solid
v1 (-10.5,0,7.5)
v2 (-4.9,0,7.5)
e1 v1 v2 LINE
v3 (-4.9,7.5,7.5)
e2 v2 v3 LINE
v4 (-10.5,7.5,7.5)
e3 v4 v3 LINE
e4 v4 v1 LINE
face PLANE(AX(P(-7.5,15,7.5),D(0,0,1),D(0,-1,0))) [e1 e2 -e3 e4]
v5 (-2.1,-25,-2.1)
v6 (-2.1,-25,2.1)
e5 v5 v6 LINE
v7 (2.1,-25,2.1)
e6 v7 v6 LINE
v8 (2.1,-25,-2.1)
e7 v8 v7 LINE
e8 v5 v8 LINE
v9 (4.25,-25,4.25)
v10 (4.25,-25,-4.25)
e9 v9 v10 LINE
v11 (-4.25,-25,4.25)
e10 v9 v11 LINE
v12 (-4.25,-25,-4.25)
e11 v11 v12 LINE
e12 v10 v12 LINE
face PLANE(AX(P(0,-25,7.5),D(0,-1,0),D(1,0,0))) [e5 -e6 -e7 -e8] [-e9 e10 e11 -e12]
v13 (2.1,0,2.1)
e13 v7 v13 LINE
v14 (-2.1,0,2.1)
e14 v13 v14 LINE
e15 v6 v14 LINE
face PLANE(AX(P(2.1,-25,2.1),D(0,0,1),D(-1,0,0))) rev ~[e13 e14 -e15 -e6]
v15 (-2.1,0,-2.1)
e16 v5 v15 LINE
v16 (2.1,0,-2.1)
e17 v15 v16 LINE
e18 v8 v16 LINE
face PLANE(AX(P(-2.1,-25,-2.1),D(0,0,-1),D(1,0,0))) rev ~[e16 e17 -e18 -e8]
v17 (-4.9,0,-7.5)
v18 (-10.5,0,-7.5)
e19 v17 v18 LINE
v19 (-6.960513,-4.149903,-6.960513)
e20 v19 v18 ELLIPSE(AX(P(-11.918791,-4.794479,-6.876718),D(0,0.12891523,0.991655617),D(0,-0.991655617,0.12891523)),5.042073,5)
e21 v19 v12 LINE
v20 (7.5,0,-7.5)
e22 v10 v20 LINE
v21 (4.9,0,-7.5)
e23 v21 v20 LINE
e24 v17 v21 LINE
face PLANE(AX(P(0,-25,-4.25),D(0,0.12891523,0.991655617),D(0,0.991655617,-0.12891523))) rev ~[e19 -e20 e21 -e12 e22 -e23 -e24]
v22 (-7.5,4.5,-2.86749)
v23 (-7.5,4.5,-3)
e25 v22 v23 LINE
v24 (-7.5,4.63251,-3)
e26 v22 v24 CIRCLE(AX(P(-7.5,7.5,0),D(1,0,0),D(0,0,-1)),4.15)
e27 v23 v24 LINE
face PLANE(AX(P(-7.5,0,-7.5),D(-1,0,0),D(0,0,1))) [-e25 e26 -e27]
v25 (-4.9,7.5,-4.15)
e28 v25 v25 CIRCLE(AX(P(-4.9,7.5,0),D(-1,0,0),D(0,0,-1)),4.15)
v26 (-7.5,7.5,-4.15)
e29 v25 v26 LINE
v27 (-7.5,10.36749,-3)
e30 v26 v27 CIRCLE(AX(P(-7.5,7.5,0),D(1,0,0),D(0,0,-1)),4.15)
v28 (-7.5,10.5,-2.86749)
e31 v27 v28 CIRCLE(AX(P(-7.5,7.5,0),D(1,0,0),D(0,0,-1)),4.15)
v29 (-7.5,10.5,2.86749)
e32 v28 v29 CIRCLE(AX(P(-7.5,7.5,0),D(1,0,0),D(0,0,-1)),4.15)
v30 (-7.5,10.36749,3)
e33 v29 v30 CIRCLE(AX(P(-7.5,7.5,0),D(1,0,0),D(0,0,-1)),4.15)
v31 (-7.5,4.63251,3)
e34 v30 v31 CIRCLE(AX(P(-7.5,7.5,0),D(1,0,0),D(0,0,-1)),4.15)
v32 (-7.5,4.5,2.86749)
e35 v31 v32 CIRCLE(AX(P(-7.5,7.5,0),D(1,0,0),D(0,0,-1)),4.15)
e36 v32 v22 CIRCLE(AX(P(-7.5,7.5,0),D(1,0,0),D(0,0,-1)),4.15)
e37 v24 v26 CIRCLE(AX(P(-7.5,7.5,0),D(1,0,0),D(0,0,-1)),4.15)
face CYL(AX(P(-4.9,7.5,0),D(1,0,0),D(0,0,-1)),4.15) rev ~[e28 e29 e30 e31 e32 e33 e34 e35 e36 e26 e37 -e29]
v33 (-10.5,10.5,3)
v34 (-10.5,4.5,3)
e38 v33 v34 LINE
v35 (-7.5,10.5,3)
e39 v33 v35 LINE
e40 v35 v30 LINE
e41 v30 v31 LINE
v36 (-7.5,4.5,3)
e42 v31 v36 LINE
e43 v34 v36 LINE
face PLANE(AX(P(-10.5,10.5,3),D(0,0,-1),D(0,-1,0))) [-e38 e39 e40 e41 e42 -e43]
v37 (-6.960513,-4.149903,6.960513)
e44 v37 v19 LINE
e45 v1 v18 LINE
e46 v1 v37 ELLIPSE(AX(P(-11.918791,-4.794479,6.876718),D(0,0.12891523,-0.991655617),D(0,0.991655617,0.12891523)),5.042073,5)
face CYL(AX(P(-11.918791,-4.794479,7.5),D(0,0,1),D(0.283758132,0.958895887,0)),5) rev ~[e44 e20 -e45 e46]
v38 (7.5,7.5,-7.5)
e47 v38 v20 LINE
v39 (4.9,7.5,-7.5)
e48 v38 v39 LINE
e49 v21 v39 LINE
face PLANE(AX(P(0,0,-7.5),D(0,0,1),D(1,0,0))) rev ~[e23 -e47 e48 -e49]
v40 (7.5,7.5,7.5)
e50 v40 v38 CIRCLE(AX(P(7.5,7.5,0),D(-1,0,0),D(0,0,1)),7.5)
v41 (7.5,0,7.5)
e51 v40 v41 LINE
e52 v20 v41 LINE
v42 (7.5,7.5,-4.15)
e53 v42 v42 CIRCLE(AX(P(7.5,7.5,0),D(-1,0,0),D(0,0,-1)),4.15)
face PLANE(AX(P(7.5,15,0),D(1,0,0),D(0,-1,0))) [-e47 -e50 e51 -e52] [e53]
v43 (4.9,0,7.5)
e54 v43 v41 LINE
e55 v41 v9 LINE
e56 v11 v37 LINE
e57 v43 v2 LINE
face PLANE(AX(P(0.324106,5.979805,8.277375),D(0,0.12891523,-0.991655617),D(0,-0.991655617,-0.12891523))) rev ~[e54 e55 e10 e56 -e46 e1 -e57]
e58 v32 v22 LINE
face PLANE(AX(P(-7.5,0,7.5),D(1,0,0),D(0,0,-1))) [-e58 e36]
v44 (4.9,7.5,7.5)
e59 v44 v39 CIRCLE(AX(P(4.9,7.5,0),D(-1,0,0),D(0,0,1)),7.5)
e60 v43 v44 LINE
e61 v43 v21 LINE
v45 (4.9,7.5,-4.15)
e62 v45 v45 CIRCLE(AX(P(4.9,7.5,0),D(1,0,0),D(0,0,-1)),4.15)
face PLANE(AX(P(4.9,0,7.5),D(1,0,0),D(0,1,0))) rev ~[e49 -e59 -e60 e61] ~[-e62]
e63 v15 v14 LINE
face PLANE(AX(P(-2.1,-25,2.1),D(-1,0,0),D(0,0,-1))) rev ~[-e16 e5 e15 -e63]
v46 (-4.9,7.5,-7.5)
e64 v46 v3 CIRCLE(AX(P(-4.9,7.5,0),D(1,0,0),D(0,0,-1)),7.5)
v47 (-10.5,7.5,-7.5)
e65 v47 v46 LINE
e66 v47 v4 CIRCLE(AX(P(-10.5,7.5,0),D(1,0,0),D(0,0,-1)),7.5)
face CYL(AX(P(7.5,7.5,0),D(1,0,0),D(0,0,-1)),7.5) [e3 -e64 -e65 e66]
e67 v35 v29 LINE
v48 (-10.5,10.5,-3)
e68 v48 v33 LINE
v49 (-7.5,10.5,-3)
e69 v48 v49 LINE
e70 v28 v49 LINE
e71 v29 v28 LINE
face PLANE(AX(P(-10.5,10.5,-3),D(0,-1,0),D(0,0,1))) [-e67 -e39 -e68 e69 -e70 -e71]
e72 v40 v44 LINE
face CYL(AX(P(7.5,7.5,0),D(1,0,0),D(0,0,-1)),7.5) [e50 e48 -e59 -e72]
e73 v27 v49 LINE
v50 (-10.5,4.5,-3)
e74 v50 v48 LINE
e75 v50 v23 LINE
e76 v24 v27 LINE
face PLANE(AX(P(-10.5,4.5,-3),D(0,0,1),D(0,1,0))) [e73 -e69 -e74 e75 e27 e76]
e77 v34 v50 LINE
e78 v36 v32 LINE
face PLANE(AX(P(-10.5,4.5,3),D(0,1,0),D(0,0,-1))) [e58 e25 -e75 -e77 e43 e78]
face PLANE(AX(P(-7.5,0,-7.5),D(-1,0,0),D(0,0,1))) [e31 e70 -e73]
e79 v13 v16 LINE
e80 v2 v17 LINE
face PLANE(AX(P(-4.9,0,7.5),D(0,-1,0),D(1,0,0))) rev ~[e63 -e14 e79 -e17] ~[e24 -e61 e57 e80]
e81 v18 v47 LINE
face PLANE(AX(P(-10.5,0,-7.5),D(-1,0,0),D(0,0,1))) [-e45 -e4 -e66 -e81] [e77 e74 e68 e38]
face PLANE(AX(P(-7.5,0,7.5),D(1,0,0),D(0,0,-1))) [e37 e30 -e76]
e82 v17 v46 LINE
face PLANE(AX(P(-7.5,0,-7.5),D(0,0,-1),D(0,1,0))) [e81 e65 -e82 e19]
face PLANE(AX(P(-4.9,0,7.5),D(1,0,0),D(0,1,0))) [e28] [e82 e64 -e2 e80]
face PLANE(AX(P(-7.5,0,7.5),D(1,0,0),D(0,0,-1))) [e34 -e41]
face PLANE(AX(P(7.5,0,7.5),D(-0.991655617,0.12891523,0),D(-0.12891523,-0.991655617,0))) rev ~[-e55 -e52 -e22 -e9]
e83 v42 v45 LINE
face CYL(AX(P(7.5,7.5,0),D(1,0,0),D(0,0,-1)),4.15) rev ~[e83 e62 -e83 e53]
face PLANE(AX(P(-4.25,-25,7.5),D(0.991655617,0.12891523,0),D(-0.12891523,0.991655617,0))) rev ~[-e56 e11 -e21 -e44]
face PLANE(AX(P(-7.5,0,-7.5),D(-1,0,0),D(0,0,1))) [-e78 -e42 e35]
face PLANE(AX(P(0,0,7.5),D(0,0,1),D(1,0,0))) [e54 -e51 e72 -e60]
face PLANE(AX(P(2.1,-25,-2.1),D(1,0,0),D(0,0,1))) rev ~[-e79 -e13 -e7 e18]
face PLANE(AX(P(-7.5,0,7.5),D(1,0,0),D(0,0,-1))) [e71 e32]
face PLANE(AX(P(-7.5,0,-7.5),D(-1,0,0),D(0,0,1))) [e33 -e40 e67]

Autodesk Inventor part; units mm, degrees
ref_plane "YZ Plane" through (0, 0, 0) normal (1, 0, 0) x (0, 1, 0)
ref_plane "XZ Plane" through (0, 0, 0) normal (0, 1, 0) x (-1, 0, 0)
ref_plane "XY Plane" through (0, 0, 0) normal (0, 0, 1) x (1, 0, 0)
sketch "Sketch1" plane through (0, 0, 0) normal (0, 0, 1) x (1, 0, 0)
  line L0 (0, 0) -> (-7.5, 0)
  line L1 (-7.5, 0) -> (-7.5, 15)
  line L2 (-7.5, 15) -> (7.5, 15)
  line L3 (7.5, 15) -> (7.5, 0)
  line L4 (7.5, 0) -> (-7.5, 0)
  dimension "d55" = 7.5
  dimension "d56" = 15
  dimension "d57" = 15
extrude "Extrusion1" add sketch "Sketch1" along normal mid plane 15
sketch "Sketch11" plane through (0, 0, 7.5) normal (0, 0, 1) x (1, 0, 0)
  line L0 (7.5, 15) -> (-7.5, 15) projected
  line L1 (0, 15) -> (0, -25)
  line L2 (0, -25) -> (4.25, -25)
  line L3 (0, -25) -> (-4.25, -25)
  line L4 (-7.5, 0) -> (7.5, 0) projected
  line L5 (-4.25, -25) -> (-7.5, 0)
  line L6 (-7.5, 0) -> (7.5, 0)
  line L7 (7.5, 0) -> (4.25, -25)
  point P0 (0, 0)
  dimension "d58" = 40
  dimension "d59" = 4.25
  dimension "d60" = 4.25
extrude "Extrusion7" add sketch "Sketch11" against normal blind 15
sketch "Sketch13" plane through (0, 0, 0) normal (1, 0, 0) x (0, 1, 0)
  line L0 (15, -7.5) -> (15, 7.5) projected
  line L1 (15, 0) -> (-25, 0)
  line L2 (-25, 7.5) -> (-25, -7.5) projected
  line L3 (-25, 0) -> (-25, 4.25)
  line L4 (-25, 7.5) -> (-25, -7.5) projected
  line L5 (-25, 4.25) -> (-25, 0)
  line L6 (-25, 0) -> (-25, -4.25)
  line L7 (0, -7.5) -> (15, -7.5) projected
  line L8 (-25, -4.25) -> (0, -7.5)
  line L9 (0, -7.5) -> (0, 7.5)
  line L10 (0, 7.5) -> (-25, 4.25)
  line L11 (-25, 4.25) -> (-25, 7.5)
  line L12 (-25, 7.5) -> (0, 7.5)
  line L13 (-25, -4.25) -> (-25, -7.5)
  line L14 (-25, -7.5) -> (0, -7.5) projected
  line L15 (-25, -7.5) -> (0, -7.5)
  point P0 (0, 0)
  dimension "d68" = 40
  dimension "d69" = 4.25
  dimension "d70" = 4.25
extrude "Extrusion8" cut sketch "Sketch13" along normal through all both and the other way through all contours L14 L2 L8 | L10 L2 L12
sketch "Sketch15" plane through (-4.25, -25, -4.25) normal (0, -1, 0) x (1, 0, 0)
  line L0 (4.25, 4.25) -> (2.15, 4.25)
  line L1 (0, 8.5) -> (0, 0) projected
  line L2 (2.15, 4.25) -> (2.15, 2.15)
  line L3 (2.15, 2.15) -> (6.35, 2.15)
  line L4 (6.35, 2.15) -> (6.35, 6.35)
  line L5 (6.35, 6.35) -> (2.15, 6.35)
  line L6 (2.15, 6.35) -> (2.15, 4.25)
  point P0 (8.5, 8.5)
  point P1 (8.5, 0)
  dimension "d112" = 2.1
  dimension "d113" = 2.1
  dimension "d114" = 4.2
  dimension "d115" = 4.2
extrude "Extrusion9" cut sketch "Sketch15" against normal through all
sketch "Sketch16" plane through (0, 0, 7.5) normal (0, 0, 1) x (1, 0, 0)
  line L0 (0, 0) -> (4.9, 0)
  line L1 (-7.5, 0) -> (7.5, 0) projected
  line L2 (4.9, 0) -> (4.9, 16.5506)
  line L3 (0, 0) -> (-4.9, 0)
  line L4 (-4.9, 0) -> (-4.9, 16.5506)
  line L5 (-4.9, 16.5506) -> (4.9, 16.5506)
  dimension "d83" = 4.9
  dimension "d84" = 4.9
extrude "Extrusion10" cut sketch "Sketch16" against normal through all
sketch "Sketch17" plane through (7.5, 15, 7.5) normal (1, 0, 0) x (0, 0, -1)
  line L0 (15, 0) -> (0, 0) projected
  line L1 (0, 0) -> (7.5, 0)
  line L2 (7.5, 0) -> (7.5, -7.5)
  arc A0 (15, -7.5) -> (0, -7.5) centre (7.5, -7.5) ccw
  line L3 (0, 0) -> (0, -15) projected
  line L4 (0, -7.5) -> (0, 0)
  line L5 (0, 0) -> (15, 0)
  line L6 (15, -15) -> (15, 0) projected
  line L7 (15, 0) -> (15, -7.5)
  point P0 (7.5, -15)
  dimension "d87" = 7.5
extrude "Extrusion11" cut sketch "Sketch17" against normal through all
sketch "Sketch18" plane through (7.5, 0, 7.5) normal (1, 0, 0) x (0, 0, -1)
  line L0 (0, 0) -> (0, 15)
  line L1 (0, 15) -> (15, 15)
  line L2 (15, 15) -> (15, 0)
  line L3 (15, 0) -> (0, 0)
  line L4 (0, 15) -> (15, 0)
  line L5 (15, 15) -> (0, 0)
  circle A0 centre (7.5, 7.5) radius 4.15
  point P0 (7.5, 0)
  dimension "d90" = 15
  dimension "d91" = 8.3
extrude "Extrusion12" cut sketch "Sketch18" against normal blind 8.3 contours A0 L4 L5 | L5 L4 A0 | A0 L5 L4 | L4 L5 A0
sketch "Sketch19" plane through (-7.5, 0, -7.5) normal (-1, 0, 0) x (0, 0, 1)
  line L0 (0, 0) -> (0, 15)
  line L1 (0, 15) -> (15, 15)
  line L2 (15, 15) -> (15, 0)
  line L3 (15, 0) -> (0, 0) projected
  line L4 (15, 0) -> (0, 0)
  point P0 (7.5, 0)
  dimension "d94" = 15
extrude "Extrusion13" add sketch "Sketch19" along normal blind 3
sketch "Sketch20" plane through (-4.9, 0, 7.5) normal (1, 0, 0) x (0, 0, -1)
  line L0 (0, 0) -> (0, 15) projected
  line L1 (0, 0) -> (0, 15)
  line L2 (0, 15) -> (15, 15)
  line L3 (15, 0) -> (0, 0) projected
  line L4 (15, 15) -> (15, 0)
  line L5 (15, 0) -> (0, 0)
  line L6 (0, 0) -> (15, 15)
  line L7 (0, 15) -> (15, 0)
  circle A0 centre (7.5, 7.5) radius 4.15
  point P0 (7.5, 0)
  dimension "d97" = 15
  dimension "d98" = 8.3
extrude "Extrusion14" cut sketch "Sketch20" against normal blind 2.6 contours A0 L7 L6 | L6 L7 A0 | A0 L6 L7 | L7 L6 A0
sketch "Sketch21" plane through (-10.5, 0, -7.5) normal (-1, 0, 0) x (0, 0, 1)
  line L0 (0, 7.5) -> (0, 0) projected
  line L1 (15, 0) -> (15, 15) projected
  line L2 (0, 0) -> (15, 15)
  line L3 (0, 15) -> (0, 0) projected
  line L4 (15, 15) -> (0, 15)
  line L5 (0, 15) -> (15, 0)
  line L6 (7.5, 7.5) -> (7.5, 10.5)
  line L7 (7.5, 10.5) -> (10.5, 10.5)
  line L8 (10.5, 10.5) -> (10.5, 4.5)
  line L9 (10.5, 4.5) -> (4.5, 4.5)
  line L10 (4.5, 4.5) -> (4.5, 10.5)
  line L11 (4.5, 10.5) -> (10.5, 10.5)
  point P0 (7.5, 0)
  dimension "d101" = 3
  dimension "d102" = 3
  dimension "d103" = 6
  dimension "d104" = 6
extrude "Extrusion15" cut sketch "Sketch21" against normal blind 3 contours L10 L5 L2 | L2 L5 L9 | L11 L6 L5 | L6 L7 L2 | L2 L8 L5
sketch "Sketch23" plane through (-4.9, 0, 7.5) normal (1, 0, 0) x (0, 0, -1)
  line L0 (0, 0) -> (0, 15) projected
  line L1 (0, 0) -> (0, 15)
  line L2 (0, 15) -> (15, 15)
  line L3 (15, 15) -> (15, 0)
  line L4 (15, 0) -> (0, 0)
  line L5 (0, 15) -> (7.5, 15)
  arc A0 (15, 7.5) -> (0, 7.5) centre (7.5, 7.5) ccw
  line L6 (0, 7.5) -> (0, 15)
  line L7 (15, 15) -> (15, 7.5)
  point P0 (7.5, 0)
  point P1 (0, 7.5)
  dimension "d107" = 15
extrude "Extrusion16" cut sketch "Sketch23" against normal through all contours L0 L2 A0 | L2 L3 A0
fillet "Fillet2" radius 5 1 edges at (-7.5, 0, 0)
sketch "Sketch25" plane through (-10.5, 0, -7.5) normal (-1, 0, 0) x (0, 0, 1)
  point P0 (7.5, 0)
equation "\"d92\" = d91"
equation "\"d105\" = d101"
properties part number "Hip Joint 2"
